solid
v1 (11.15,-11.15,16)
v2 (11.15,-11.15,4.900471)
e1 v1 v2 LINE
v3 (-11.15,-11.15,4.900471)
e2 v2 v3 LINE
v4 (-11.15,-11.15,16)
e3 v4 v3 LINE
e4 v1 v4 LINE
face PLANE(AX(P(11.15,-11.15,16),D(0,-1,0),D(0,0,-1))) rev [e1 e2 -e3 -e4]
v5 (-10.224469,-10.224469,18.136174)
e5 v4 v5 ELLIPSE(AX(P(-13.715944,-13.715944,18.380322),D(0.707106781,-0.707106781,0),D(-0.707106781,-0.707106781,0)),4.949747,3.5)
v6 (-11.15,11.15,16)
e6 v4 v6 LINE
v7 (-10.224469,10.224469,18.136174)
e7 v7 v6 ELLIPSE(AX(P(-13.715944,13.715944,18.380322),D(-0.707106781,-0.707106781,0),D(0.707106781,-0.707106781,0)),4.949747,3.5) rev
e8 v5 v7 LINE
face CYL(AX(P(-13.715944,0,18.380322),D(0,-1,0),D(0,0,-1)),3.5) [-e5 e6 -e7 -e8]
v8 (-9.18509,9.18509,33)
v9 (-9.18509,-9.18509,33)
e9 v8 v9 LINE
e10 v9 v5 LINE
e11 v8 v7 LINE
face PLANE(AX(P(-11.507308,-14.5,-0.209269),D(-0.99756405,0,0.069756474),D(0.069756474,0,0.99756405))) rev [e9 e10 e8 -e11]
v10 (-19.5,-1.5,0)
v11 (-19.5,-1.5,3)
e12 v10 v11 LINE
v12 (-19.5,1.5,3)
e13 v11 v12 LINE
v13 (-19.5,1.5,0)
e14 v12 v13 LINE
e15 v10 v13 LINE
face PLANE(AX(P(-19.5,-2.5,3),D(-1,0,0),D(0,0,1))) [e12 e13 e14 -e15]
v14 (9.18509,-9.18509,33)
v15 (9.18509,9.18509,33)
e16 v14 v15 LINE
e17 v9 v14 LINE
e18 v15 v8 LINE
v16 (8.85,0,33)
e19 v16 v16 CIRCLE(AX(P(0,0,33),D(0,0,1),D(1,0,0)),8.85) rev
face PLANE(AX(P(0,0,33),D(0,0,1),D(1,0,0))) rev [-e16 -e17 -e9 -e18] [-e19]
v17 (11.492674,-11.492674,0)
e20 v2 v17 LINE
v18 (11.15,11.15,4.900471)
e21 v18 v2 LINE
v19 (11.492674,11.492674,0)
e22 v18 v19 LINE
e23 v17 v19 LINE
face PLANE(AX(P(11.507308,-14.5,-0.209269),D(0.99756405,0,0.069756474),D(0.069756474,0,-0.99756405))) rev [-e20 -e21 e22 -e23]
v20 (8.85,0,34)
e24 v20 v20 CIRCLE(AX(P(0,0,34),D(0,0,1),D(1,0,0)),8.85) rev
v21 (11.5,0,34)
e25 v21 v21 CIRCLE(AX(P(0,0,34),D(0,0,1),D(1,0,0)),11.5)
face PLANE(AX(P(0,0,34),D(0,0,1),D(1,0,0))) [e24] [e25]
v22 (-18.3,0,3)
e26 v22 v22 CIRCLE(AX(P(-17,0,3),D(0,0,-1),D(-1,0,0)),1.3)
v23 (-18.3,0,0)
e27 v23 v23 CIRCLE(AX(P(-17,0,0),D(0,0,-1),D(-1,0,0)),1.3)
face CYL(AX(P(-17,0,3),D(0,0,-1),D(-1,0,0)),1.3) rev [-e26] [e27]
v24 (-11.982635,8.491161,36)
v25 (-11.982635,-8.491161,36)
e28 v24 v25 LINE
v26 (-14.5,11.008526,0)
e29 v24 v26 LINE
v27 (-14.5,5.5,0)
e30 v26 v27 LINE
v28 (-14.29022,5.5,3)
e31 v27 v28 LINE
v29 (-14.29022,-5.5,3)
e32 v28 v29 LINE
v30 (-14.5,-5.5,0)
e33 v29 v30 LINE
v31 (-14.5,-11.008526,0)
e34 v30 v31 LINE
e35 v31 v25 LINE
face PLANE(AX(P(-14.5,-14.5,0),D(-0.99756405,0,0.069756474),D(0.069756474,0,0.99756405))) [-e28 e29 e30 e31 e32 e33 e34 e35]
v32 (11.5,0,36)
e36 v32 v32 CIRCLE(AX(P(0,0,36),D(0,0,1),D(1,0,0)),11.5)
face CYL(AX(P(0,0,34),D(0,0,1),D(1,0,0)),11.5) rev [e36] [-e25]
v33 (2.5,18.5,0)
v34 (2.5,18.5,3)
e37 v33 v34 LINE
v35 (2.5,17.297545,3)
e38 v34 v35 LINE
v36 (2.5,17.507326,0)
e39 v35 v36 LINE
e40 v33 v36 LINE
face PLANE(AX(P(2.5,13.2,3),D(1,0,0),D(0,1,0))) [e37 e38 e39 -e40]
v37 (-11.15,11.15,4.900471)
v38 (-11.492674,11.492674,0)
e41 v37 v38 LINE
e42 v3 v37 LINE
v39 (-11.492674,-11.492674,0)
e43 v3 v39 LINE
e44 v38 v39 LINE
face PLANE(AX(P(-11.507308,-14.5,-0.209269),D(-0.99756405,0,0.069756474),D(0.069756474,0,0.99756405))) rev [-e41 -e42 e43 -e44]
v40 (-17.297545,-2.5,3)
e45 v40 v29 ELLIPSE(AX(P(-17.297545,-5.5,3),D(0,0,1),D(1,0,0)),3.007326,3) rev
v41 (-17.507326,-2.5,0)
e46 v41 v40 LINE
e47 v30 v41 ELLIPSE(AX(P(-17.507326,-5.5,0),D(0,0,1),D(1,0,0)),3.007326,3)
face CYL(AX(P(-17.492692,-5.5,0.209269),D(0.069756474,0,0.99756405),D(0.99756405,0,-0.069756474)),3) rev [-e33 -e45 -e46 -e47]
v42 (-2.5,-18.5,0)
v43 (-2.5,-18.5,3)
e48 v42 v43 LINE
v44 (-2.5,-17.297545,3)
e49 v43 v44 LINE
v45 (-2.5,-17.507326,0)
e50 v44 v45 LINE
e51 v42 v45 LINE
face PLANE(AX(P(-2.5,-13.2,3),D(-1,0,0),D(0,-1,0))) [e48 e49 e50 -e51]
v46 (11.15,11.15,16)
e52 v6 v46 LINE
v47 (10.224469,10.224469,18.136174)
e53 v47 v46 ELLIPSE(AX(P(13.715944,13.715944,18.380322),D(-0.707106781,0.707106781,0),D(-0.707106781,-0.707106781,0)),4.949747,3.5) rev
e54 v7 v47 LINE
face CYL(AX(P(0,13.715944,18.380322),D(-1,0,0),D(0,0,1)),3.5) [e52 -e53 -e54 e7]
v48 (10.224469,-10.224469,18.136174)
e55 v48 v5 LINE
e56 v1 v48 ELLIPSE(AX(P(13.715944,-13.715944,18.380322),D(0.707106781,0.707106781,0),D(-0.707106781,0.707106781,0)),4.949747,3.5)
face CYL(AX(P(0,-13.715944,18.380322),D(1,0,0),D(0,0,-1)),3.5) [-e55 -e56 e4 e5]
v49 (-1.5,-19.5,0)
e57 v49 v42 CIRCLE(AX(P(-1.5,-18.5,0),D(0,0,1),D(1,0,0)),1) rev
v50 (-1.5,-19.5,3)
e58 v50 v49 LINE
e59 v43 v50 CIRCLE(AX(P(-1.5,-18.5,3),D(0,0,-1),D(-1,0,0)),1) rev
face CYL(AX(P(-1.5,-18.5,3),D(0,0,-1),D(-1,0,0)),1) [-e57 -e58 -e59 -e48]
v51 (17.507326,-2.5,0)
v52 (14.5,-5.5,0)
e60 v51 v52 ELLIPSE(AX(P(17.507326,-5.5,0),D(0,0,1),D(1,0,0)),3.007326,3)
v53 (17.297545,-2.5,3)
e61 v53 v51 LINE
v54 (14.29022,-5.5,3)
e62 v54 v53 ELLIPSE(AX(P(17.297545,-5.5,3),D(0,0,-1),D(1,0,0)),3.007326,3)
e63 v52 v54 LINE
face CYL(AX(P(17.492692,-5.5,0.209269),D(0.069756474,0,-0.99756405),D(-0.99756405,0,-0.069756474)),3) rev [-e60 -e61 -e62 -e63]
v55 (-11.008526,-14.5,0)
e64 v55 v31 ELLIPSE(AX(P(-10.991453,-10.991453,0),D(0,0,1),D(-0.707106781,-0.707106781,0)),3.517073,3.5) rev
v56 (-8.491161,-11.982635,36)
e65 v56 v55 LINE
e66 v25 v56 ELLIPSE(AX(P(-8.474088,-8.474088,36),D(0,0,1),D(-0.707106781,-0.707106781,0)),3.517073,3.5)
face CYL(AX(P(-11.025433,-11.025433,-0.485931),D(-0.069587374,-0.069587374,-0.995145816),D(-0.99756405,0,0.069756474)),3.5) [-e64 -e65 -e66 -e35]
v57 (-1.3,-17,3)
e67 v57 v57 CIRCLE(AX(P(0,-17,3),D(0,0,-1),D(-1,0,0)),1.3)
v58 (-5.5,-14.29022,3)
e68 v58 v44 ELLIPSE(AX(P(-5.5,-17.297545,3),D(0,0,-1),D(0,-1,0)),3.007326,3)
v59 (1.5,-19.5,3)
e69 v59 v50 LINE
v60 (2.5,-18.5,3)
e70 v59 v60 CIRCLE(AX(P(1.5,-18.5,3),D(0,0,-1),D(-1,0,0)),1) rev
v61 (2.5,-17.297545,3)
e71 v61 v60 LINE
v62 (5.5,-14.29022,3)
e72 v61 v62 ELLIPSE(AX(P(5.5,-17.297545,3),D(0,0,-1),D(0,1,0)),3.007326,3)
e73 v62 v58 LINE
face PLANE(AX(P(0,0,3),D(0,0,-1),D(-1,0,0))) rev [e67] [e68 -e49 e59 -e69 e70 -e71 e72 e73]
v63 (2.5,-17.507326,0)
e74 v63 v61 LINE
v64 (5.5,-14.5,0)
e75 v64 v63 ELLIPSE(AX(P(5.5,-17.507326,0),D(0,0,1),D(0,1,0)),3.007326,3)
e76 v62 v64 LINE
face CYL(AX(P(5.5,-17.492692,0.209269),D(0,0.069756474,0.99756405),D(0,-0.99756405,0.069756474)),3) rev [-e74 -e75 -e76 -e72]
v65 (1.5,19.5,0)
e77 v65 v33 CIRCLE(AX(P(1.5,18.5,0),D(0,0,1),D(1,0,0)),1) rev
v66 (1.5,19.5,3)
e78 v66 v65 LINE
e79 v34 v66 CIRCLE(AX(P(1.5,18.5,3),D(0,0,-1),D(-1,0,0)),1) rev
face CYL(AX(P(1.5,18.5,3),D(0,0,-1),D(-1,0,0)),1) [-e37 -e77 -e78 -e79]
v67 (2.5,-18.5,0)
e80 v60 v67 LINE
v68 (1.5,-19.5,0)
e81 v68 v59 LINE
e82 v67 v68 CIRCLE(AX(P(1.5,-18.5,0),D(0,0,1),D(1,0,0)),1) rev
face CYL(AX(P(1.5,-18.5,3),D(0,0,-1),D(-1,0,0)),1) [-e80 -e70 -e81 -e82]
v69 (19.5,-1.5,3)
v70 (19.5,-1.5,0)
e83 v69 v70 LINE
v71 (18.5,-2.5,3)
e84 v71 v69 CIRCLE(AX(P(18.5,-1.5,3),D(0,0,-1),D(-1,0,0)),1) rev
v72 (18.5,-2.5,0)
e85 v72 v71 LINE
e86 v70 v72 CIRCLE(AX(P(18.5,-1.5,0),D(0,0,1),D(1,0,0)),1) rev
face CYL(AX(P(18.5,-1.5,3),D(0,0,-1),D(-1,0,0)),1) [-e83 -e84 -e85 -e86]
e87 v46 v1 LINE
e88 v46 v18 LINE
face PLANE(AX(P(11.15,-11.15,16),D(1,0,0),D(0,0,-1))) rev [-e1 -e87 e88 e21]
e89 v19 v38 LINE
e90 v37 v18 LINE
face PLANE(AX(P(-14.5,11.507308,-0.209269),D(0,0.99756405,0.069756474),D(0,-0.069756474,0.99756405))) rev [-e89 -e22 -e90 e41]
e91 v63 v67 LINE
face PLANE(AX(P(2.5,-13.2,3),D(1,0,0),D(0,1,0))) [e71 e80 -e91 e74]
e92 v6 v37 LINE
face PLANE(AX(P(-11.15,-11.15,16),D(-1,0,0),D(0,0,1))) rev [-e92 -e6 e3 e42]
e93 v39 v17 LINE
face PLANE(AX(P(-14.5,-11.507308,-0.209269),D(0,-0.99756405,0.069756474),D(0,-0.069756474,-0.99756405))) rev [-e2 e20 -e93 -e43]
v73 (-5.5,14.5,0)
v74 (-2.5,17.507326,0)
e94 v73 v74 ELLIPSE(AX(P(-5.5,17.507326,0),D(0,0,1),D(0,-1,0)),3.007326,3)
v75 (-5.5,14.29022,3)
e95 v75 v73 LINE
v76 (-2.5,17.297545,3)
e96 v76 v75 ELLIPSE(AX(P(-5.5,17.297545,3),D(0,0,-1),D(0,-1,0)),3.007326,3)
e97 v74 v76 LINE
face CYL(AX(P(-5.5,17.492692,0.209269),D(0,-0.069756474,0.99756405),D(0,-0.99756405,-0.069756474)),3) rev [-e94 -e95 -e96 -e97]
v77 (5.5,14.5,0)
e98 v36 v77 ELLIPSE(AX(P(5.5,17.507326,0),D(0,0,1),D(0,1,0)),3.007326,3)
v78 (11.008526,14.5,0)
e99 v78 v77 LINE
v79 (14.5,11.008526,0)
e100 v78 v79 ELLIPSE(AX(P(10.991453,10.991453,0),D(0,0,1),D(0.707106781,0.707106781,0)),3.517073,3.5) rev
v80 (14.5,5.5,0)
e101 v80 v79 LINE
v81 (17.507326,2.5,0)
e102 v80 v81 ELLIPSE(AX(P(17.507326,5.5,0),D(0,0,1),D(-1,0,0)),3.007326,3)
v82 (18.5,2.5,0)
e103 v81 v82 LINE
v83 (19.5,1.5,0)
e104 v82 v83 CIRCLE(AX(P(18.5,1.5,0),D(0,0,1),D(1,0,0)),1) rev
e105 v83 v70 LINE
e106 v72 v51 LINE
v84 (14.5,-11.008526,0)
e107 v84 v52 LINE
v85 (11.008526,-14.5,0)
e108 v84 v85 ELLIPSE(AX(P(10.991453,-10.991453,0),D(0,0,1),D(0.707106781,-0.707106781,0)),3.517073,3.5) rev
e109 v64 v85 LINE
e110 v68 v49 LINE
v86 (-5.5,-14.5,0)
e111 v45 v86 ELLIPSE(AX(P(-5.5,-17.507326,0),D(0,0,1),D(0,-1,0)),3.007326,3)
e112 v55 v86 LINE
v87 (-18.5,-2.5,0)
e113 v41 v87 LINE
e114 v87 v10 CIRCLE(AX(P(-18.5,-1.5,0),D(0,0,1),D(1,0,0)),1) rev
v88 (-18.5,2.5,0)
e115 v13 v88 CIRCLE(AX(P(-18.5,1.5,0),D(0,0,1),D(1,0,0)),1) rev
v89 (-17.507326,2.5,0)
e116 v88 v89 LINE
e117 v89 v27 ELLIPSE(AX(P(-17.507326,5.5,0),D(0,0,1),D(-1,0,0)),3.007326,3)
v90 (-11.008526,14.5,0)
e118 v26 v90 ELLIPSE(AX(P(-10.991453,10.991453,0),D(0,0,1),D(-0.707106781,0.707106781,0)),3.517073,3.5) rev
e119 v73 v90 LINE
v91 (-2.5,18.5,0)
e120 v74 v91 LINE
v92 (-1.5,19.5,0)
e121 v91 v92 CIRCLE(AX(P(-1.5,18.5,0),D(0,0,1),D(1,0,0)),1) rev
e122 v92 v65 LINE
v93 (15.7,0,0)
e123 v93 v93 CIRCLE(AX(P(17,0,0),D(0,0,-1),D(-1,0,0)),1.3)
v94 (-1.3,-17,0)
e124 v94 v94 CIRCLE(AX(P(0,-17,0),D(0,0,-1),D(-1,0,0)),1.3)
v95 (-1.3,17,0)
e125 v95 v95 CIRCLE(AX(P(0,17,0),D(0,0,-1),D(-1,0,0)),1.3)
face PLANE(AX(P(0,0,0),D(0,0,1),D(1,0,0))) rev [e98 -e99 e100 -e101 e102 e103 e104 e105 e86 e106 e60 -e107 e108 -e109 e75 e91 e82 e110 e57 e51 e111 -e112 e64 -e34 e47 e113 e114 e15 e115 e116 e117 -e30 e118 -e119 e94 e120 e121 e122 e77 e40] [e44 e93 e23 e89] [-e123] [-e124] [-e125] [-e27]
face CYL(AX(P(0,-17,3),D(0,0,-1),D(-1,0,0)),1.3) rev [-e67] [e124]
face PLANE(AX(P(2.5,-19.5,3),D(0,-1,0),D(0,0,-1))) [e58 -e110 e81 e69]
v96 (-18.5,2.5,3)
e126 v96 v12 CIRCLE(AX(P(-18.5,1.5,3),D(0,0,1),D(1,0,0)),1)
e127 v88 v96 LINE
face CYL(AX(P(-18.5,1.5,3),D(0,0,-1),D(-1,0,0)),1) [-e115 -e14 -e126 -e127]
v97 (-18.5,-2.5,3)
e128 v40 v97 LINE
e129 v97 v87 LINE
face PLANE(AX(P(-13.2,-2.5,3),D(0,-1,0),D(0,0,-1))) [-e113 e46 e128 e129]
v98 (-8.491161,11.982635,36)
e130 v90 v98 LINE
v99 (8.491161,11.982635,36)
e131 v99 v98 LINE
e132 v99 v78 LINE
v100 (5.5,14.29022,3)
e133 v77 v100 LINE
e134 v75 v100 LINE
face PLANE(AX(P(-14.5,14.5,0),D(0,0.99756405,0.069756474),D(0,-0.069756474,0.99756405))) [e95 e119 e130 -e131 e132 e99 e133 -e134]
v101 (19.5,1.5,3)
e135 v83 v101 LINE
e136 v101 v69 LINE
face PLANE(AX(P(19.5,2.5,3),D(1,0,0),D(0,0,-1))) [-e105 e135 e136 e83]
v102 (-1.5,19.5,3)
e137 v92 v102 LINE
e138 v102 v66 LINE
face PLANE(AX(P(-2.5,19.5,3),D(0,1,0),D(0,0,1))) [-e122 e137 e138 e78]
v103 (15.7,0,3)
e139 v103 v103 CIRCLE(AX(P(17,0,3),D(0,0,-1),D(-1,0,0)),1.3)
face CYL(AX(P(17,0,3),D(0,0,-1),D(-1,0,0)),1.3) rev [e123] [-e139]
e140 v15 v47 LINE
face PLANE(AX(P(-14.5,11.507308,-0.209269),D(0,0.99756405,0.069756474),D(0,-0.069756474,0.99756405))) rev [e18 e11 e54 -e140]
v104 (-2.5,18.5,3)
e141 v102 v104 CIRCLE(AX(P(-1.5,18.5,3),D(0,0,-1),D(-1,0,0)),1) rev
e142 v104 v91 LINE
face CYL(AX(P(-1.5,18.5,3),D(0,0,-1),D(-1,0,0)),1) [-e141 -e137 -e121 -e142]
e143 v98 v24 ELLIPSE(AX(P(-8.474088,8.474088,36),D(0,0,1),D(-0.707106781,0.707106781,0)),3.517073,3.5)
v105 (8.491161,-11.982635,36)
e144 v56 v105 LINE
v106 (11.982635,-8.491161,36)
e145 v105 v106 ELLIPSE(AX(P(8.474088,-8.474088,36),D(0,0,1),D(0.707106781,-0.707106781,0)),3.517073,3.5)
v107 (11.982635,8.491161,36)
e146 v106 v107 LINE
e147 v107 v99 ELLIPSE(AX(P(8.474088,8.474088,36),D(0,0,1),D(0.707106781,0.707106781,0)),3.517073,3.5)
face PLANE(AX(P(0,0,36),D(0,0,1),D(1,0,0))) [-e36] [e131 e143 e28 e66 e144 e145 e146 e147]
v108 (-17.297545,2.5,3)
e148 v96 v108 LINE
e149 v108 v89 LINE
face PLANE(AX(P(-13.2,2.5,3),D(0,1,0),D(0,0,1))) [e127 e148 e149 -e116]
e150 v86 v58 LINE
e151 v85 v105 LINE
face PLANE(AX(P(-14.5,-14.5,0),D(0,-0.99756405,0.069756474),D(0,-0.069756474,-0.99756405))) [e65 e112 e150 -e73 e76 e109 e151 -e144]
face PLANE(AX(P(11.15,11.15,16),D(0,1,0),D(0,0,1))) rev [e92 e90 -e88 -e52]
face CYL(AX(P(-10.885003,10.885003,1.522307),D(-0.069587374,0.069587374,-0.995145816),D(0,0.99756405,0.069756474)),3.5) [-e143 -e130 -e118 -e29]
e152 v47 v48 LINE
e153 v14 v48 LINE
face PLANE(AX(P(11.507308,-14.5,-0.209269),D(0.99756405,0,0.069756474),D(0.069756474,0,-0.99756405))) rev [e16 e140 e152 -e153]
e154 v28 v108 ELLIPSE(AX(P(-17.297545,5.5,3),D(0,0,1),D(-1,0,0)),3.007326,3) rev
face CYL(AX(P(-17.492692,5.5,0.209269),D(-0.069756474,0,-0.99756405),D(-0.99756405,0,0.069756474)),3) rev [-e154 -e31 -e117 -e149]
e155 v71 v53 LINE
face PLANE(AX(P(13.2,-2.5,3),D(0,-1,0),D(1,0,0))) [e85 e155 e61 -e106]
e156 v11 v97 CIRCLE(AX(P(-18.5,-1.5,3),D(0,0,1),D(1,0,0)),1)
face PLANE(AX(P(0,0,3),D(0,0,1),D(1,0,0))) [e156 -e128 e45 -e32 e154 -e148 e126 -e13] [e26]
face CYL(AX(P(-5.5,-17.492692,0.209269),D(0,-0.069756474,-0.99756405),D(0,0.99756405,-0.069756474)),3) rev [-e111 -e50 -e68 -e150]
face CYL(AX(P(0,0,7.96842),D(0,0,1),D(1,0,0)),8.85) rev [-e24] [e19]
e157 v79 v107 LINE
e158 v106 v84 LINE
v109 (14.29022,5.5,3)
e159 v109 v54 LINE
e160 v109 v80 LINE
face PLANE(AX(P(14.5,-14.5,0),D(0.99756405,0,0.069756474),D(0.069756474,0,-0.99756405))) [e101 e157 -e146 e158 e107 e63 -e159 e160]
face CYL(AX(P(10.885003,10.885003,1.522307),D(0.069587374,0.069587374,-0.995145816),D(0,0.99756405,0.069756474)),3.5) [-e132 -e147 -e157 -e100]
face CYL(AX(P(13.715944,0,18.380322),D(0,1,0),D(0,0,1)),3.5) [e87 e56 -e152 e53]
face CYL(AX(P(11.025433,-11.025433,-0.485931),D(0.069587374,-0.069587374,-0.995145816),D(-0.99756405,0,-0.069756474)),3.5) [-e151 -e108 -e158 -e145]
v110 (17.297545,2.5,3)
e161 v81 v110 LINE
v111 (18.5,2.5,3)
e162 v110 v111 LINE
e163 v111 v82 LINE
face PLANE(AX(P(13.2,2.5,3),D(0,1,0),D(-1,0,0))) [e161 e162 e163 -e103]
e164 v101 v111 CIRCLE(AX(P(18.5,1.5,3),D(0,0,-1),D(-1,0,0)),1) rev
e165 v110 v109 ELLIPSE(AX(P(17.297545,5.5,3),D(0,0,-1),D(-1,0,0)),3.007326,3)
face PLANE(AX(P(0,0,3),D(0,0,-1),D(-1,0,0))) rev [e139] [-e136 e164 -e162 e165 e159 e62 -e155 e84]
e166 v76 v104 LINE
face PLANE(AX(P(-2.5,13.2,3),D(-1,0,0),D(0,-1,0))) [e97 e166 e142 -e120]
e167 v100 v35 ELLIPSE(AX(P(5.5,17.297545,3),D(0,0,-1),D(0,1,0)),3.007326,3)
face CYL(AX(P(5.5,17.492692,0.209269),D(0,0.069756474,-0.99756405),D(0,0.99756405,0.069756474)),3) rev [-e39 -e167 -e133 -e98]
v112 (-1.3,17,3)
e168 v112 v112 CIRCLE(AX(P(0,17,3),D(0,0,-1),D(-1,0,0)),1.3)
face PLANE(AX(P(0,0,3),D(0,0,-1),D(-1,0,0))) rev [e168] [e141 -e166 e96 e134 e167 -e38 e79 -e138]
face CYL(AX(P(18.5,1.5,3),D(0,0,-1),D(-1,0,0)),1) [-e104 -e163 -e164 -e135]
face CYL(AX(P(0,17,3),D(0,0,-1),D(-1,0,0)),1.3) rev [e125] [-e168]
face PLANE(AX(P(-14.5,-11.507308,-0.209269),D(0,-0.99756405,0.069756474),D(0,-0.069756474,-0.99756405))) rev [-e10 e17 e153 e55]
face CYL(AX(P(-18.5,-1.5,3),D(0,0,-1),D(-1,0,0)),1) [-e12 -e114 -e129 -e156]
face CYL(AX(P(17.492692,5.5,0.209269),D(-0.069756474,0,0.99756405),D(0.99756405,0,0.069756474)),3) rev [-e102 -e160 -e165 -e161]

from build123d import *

# Parameters (mm, degrees)
SKETCH_1_W          = 29
SKETCH_1_H          = 29
EXTRUDE_1_DEPTH     = 36
EXTRUDE_1_TAPER     = 4
SHELL_1_T           = -3
SKETCH_3_W          = 22.3
SKETCH_3_H          = 22.3
CUT_EXTRUDE_2_DEPTH = 16
FILLET_1_R          = 3.5
FILLET_2_R          = 3.5
SKETCH_4_R          = 8.85
CUT_EXTRUDE_3_DEPTH = 3
SKETCH_5_R          = 11.5
CUT_EXTRUDE_4_DEPTH = 2
SKETCH_6_W          = 6.3
SKETCH_6_H          = 5
SKETCH_6_R          = 1.3
SKETCH_6_W_2        = 5
SKETCH_6_H_2        = 6.3
EXTRUDE_2_DEPTH     = 3
FILLET_3_R          = 3
FILLET_4_R          = 1


with BuildPart() as part:
    # Эскиз1 → Бобышка-Вытянуть1 (new body)
    with BuildSketch(Plane.XY):
        Rectangle(SKETCH_1_W, SKETCH_1_H)
    extrude(amount=EXTRUDE_1_DEPTH, taper=EXTRUDE_1_TAPER)

    # Оболочка1
    shell_1_openings = [part.faces().sort_by_distance(p)[0] for p in [
        (0, 0, 0),
    ]]
    offset(amount=SHELL_1_T, openings=shell_1_openings, kind=Kind.INTERSECTION)

    # Эскиз3 → Вырез-Вытянуть2 (cut)
    with BuildSketch(Plane(origin=(0, 0, 0), x_dir=(-1, 0, 0), z_dir=(0, 0, -1))):
        Rectangle(SKETCH_3_W, SKETCH_3_H)
    extrude(amount=-CUT_EXTRUDE_2_DEPTH, mode=Mode.SUBTRACT)

    # Скругление1
    # the kernel refuses this fillet: 3.5 mm, written as the material it takes off along each edge
    with BuildSketch(Plane(origin=(-10.373845315, -15.727322236, 16), x_dir=(-1, 0, 0), z_dir=(0, 1, 0))) as fillet_1_piece_1_section:
        with BuildLine():
            CenterArc((3.342098307, 2.380322106), FILLET_1_R, 184, 38.850835044)
            Line((-0.149375869, 2.136174448), (0, 0))
            Line((0, 0), (0.776154685, 0))
        make_face()
    fillet_1_piece_1 = extrude(amount=31.454644473, mode=Mode.PRIVATE)
    fillet_1_piece_1 = split(fillet_1_piece_1, bisect_by=Plane(origin=(-10.373845315, -10.399895149, 15.627470008), z_dir=(0, 0.9975640502598243, -0.06975647374412536)), keep=Keep.TOP, mode=Mode.PRIVATE)
    fillet_1_piece_1 = split(fillet_1_piece_1, bisect_by=Plane(origin=(-10.373845315, 10.24683793, 17.816290213), z_dir=(0, -0.9975640502598243, -0.06975647374412536)), keep=Keep.TOP, mode=Mode.PRIVATE)
    add(fillet_1_piece_1, mode=Mode.SUBTRACT)
    with BuildSketch(Plane(origin=(15.727322236, -10.373845315, 16), x_dir=(0, -1, 0), z_dir=(-1, 0, 0))) as fillet_1_piece_2_section:
        with BuildLine():
            CenterArc((3.342098307, 2.380322106), FILLET_1_R, 184, 38.850835044)
            Line((-0.149375869, 2.136174448), (0, 0))
            Line((0, 0), (0.776154685, 0))
        make_face()
    fillet_1_piece_2 = extrude(amount=31.454644473, mode=Mode.PRIVATE)
    fillet_1_piece_2 = split(fillet_1_piece_2, bisect_by=Plane(origin=(-10.24683793, -10.373845315, 17.816290213), z_dir=(0.9975640502598243, 0, -0.06975647374412536)), keep=Keep.TOP, mode=Mode.PRIVATE)
    fillet_1_piece_2 = split(fillet_1_piece_2, bisect_by=Plane(origin=(10.399895149, -10.373845315, 15.627470008), z_dir=(-0.9975640502598243, 0, -0.06975647374412536)), keep=Keep.TOP, mode=Mode.PRIVATE)
    add(fillet_1_piece_2, mode=Mode.SUBTRACT)
    with BuildSketch(Plane(origin=(10.373845315, 15.727322236, 16), x_dir=(1, 0, 0), z_dir=(0, -1, 0))) as fillet_1_piece_3_section:
        with BuildLine():
            CenterArc((3.342098307, 2.380322106), FILLET_1_R, 184, 38.850835044)
            Line((-0.149375869, 2.136174448), (0, 0))
            Line((0, 0), (0.776154685, 0))
        make_face()
    fillet_1_piece_3 = extrude(amount=31.454644473, mode=Mode.PRIVATE)
    fillet_1_piece_3 = split(fillet_1_piece_3, bisect_by=Plane(origin=(10.373845315, -10.24683793, 17.816290213), z_dir=(0, 0.9975640502598243, -0.06975647374412536)), keep=Keep.TOP, mode=Mode.PRIVATE)
    fillet_1_piece_3 = split(fillet_1_piece_3, bisect_by=Plane(origin=(10.373845315, 10.399895149, 15.627470008), z_dir=(0, -0.9975640502598243, -0.06975647374412536)), keep=Keep.TOP, mode=Mode.PRIVATE)
    add(fillet_1_piece_3, mode=Mode.SUBTRACT)
    with BuildSketch(Plane(origin=(-15.727322236, 10.373845315, 16), x_dir=(0, 1, 0), z_dir=(1, 0, 0))) as fillet_1_piece_4_section:
        with BuildLine():
            CenterArc((3.342098307, 2.380322106), FILLET_1_R, 184, 38.850835044)
            Line((-0.149375869, 2.136174448), (0, 0))
            Line((0, 0), (0.776154685, 0))
        make_face()
    fillet_1_piece_4 = extrude(amount=31.454644473, mode=Mode.PRIVATE)
    fillet_1_piece_4 = split(fillet_1_piece_4, bisect_by=Plane(origin=(-10.399895149, 10.373845315, 15.627470008), z_dir=(0.9975640502598243, 0, -0.06975647374412536)), keep=Keep.TOP, mode=Mode.PRIVATE)
    fillet_1_piece_4 = split(fillet_1_piece_4, bisect_by=Plane(origin=(10.24683793, 10.373845315, 17.816290213), z_dir=(-0.9975640502598243, 0, -0.06975647374412536)), keep=Keep.TOP, mode=Mode.PRIVATE)
    add(fillet_1_piece_4, mode=Mode.SUBTRACT)
    with BuildSketch(Plane(origin=(15.727322236, -10.373845315, 16), x_dir=(0, -1, 0), z_dir=(-1, 0, 0))) as fillet_1_piece_5a_section:
        with BuildLine():
            CenterArc((3.342098307, 2.380322106), FILLET_1_R, 184, 38.850835044)
            Line((-0.149375869, 2.136174448), (0, 0))
            Line((0, 0), (0.776154685, 0))
        make_face()
    fillet_1_piece_5a = extrude(amount=31.454644473, mode=Mode.PRIVATE)
    fillet_1_piece_5a = split(fillet_1_piece_5a, bisect_by=Plane(origin=(-11.15, -10.373845315, 16), z_dir=(1, 0, 0)), keep=Keep.TOP, mode=Mode.PRIVATE)
    fillet_1_piece_5a = split(fillet_1_piece_5a, bisect_by=Plane(origin=(-10.24683793, -10.373845315, 17.816290213), z_dir=(-0.9975640502598243, 0, 0.06975647374412536)), keep=Keep.TOP, mode=Mode.PRIVATE)
    with BuildSketch(Plane(origin=(-10.373845315, -15.727322236, 16), x_dir=(-1, 0, 0), z_dir=(0, 1, 0))) as fillet_1_piece_5b_section:
        with BuildLine():
            CenterArc((3.342098307, 2.380322106), FILLET_1_R, 184, 38.850835044)
            Line((-0.149375869, 2.136174448), (0, 0))
            Line((0, 0), (0.776154685, 0))
        make_face()
    fillet_1_piece_5b = extrude(amount=31.454644473, mode=Mode.PRIVATE)
    fillet_1_piece_5b = split(fillet_1_piece_5b, bisect_by=Plane(origin=(-10.373845315, -11.15, 16), z_dir=(0, 1, 0)), keep=Keep.TOP, mode=Mode.PRIVATE)
    fillet_1_piece_5b = split(fillet_1_piece_5b, bisect_by=Plane(origin=(-10.373845315, -10.399895149, 15.627470008), z_dir=(0, -0.9975640502598243, 0.06975647374412536)), keep=Keep.TOP, mode=Mode.PRIVATE)
    fillet_1_piece_5 = fillet_1_piece_5a & fillet_1_piece_5b
    add(fillet_1_piece_5, mode=Mode.SUBTRACT)
    with BuildSketch(Plane(origin=(-10.373845315, -15.727322236, 16), x_dir=(-1, 0, 0), z_dir=(0, 1, 0))) as fillet_1_piece_6a_section:
        with BuildLine():
            CenterArc((3.342098307, 2.380322106), FILLET_1_R, 184, 38.850835044)
            Line((-0.149375869, 2.136174448), (0, 0))
            Line((0, 0), (0.776154685, 0))
        make_face()
    fillet_1_piece_6a = extrude(amount=31.454644473, mode=Mode.PRIVATE)
    fillet_1_piece_6a = split(fillet_1_piece_6a, bisect_by=Plane(origin=(-10.373845315, 11.15, 16), z_dir=(0, -1, 0)), keep=Keep.TOP, mode=Mode.PRIVATE)
    fillet_1_piece_6a = split(fillet_1_piece_6a, bisect_by=Plane(origin=(-10.373845315, 10.24683793, 17.816290213), z_dir=(0, 0.9975640502598243, 0.06975647374412536)), keep=Keep.TOP, mode=Mode.PRIVATE)
    with BuildSketch(Plane(origin=(-15.727322236, 10.373845315, 16), x_dir=(0, 1, 0), z_dir=(1, 0, 0))) as fillet_1_piece_6b_section:
        with BuildLine():
            CenterArc((3.342098307, 2.380322106), FILLET_1_R, 184, 38.850835044)
            Line((-0.149375869, 2.136174448), (0, 0))
            Line((0, 0), (0.776154685, 0))
        make_face()
    fillet_1_piece_6b = extrude(amount=31.454644473, mode=Mode.PRIVATE)
    fillet_1_piece_6b = split(fillet_1_piece_6b, bisect_by=Plane(origin=(-11.15, 10.373845315, 16), z_dir=(1, 0, 0)), keep=Keep.TOP, mode=Mode.PRIVATE)
    fillet_1_piece_6b = split(fillet_1_piece_6b, bisect_by=Plane(origin=(-10.399895149, 10.373845315, 15.627470008), z_dir=(-0.9975640502598243, 0, 0.06975647374412536)), keep=Keep.TOP, mode=Mode.PRIVATE)
    fillet_1_piece_6 = fillet_1_piece_6a & fillet_1_piece_6b
    add(fillet_1_piece_6, mode=Mode.SUBTRACT)
    with BuildSketch(Plane(origin=(15.727322236, -10.373845315, 16), x_dir=(0, -1, 0), z_dir=(-1, 0, 0))) as fillet_1_piece_7a_section:
        with BuildLine():
            CenterArc((3.342098307, 2.380322106), FILLET_1_R, 184, 38.850835044)
            Line((-0.149375869, 2.136174448), (0, 0))
            Line((0, 0), (0.776154685, 0))
        make_face()
    fillet_1_piece_7a = extrude(amount=31.454644473, mode=Mode.PRIVATE)
    fillet_1_piece_7a = split(fillet_1_piece_7a, bisect_by=Plane(origin=(11.15, -10.373845315, 16), z_dir=(-1, 0, 0)), keep=Keep.TOP, mode=Mode.PRIVATE)
    fillet_1_piece_7a = split(fillet_1_piece_7a, bisect_by=Plane(origin=(10.399895149, -10.373845315, 15.627470008), z_dir=(0.9975640502598243, 0, 0.06975647374412536)), keep=Keep.TOP, mode=Mode.PRIVATE)
    with BuildSketch(Plane(origin=(10.373845315, 15.727322236, 16), x_dir=(1, 0, 0), z_dir=(0, -1, 0))) as fillet_1_piece_7b_section:
        with BuildLine():
            CenterArc((3.342098307, 2.380322106), FILLET_1_R, 184, 38.850835044)
            Line((-0.149375869, 2.136174448), (0, 0))
            Line((0, 0), (0.776154685, 0))
        make_face()
    fillet_1_piece_7b = extrude(amount=31.454644473, mode=Mode.PRIVATE)
    fillet_1_piece_7b = split(fillet_1_piece_7b, bisect_by=Plane(origin=(10.373845315, -11.15, 16), z_dir=(0, 1, 0)), keep=Keep.TOP, mode=Mode.PRIVATE)
    fillet_1_piece_7b = split(fillet_1_piece_7b, bisect_by=Plane(origin=(10.373845315, -10.24683793, 17.816290213), z_dir=(0, -0.9975640502598243, 0.06975647374412536)), keep=Keep.TOP, mode=Mode.PRIVATE)
    fillet_1_piece_7 = fillet_1_piece_7a & fillet_1_piece_7b
    add(fillet_1_piece_7, mode=Mode.SUBTRACT)
    with BuildSketch(Plane(origin=(-15.727322236, 10.373845315, 16), x_dir=(0, 1, 0), z_dir=(1, 0, 0))) as fillet_1_piece_8a_section:
        with BuildLine():
            CenterArc((3.342098307, 2.380322106), FILLET_1_R, 184, 38.850835044)
            Line((-0.149375869, 2.136174448), (0, 0))
            Line((0, 0), (0.776154685, 0))
        make_face()
    fillet_1_piece_8a = extrude(amount=31.454644473, mode=Mode.PRIVATE)
    fillet_1_piece_8a = split(fillet_1_piece_8a, bisect_by=Plane(origin=(11.15, 10.373845315, 16), z_dir=(-1, 0, 0)), keep=Keep.TOP, mode=Mode.PRIVATE)
    fillet_1_piece_8a = split(fillet_1_piece_8a, bisect_by=Plane(origin=(10.24683793, 10.373845315, 17.816290213), z_dir=(0.9975640502598243, 0, 0.06975647374412536)), keep=Keep.TOP, mode=Mode.PRIVATE)
    with BuildSketch(Plane(origin=(10.373845315, 15.727322236, 16), x_dir=(1, 0, 0), z_dir=(0, -1, 0))) as fillet_1_piece_8b_section:
        with BuildLine():
            CenterArc((3.342098307, 2.380322106), FILLET_1_R, 184, 38.850835044)
            Line((-0.149375869, 2.136174448), (0, 0))
            Line((0, 0), (0.776154685, 0))
        make_face()
    fillet_1_piece_8b = extrude(amount=31.454644473, mode=Mode.PRIVATE)
    fillet_1_piece_8b = split(fillet_1_piece_8b, bisect_by=Plane(origin=(10.373845315, 11.15, 16), z_dir=(0, -1, 0)), keep=Keep.TOP, mode=Mode.PRIVATE)
    fillet_1_piece_8b = split(fillet_1_piece_8b, bisect_by=Plane(origin=(10.373845315, 10.399895149, 15.627470008), z_dir=(0, 0.9975640502598243, 0.06975647374412536)), keep=Keep.TOP, mode=Mode.PRIVATE)
    fillet_1_piece_8 = fillet_1_piece_8a & fillet_1_piece_8b
    add(fillet_1_piece_8, mode=Mode.SUBTRACT)

    # Скругление2
    fillet_2_edges = [part.edges().sort_by_distance(p)[0] for p in [
        (-13.241317385, -13.241317385, 18),
        (-13.241317385, 13.241317385, 18),
        (13.241316923, 13.241316923, 18.000006606),
        (13.241317385, -13.241317385, 18),
    ]]
    fillet(fillet_2_edges, radius=FILLET_2_R)

    # Эскиз4 → Вырез-Вытянуть3 (cut)
    with BuildSketch(Plane.XY.offset(36)):
        Circle(SKETCH_4_R)
    extrude(amount=-CUT_EXTRUDE_3_DEPTH, mode=Mode.SUBTRACT)

    # Эскиз5 → Вырез-Вытянуть4 (cut)
    with BuildSketch(Plane.XY.offset(36)):
        Circle(SKETCH_5_R)
    extrude(amount=-CUT_EXTRUDE_4_DEPTH, mode=Mode.SUBTRACT)

    # Эскиз6 → Бобышка-Вытянуть2 (add)
    # profile 1 of 4: a face of its own
    with BuildSketch(Plane(origin=(0, 0, 0), x_dir=(-1, 0, 0), z_dir=(0, 0, -1))):
        with Locations((16.35, 0)):
            Rectangle(SKETCH_6_W, SKETCH_6_H)
        with Locations((17, 0)):
            Circle(SKETCH_6_R, mode=Mode.SUBTRACT)
    # profile 2 of 4: a face of its own
    with BuildSketch(Plane(origin=(0, 0, 0), x_dir=(-1, 0, 0), z_dir=(0, 0, -1))):
        with Locations((0, -16.35)):
            Rectangle(SKETCH_6_W_2, SKETCH_6_H_2)
        with Locations((0, -17)):
            Circle(SKETCH_6_R, mode=Mode.SUBTRACT)
    # profile 3 of 4: a face of its own
    with BuildSketch(Plane(origin=(0, 0, 0), x_dir=(-1, 0, 0), z_dir=(0, 0, -1))):
        with Locations((-16.35, 0)):
            Rectangle(SKETCH_6_W, SKETCH_6_H)
        with Locations((-17, 0)):
            Circle(SKETCH_6_R, mode=Mode.SUBTRACT)
    # profile 4 of 4: a face of its own
    with BuildSketch(Plane(origin=(0, 0, 0), x_dir=(-1, 0, 0), z_dir=(0, 0, -1))):
        with Locations((0, 16.35)):
            Rectangle(SKETCH_6_W_2, SKETCH_6_H_2)
        with Locations((0, 17)):
            Circle(SKETCH_6_R, mode=Mode.SUBTRACT)
    extrude(amount=-EXTRUDE_2_DEPTH)

    # Скругление3
    fillet_3_edges = [part.edges().sort_by_distance(p)[0] for p in [
        (-14.395109782, -2.5, 1.5),
        (-14.395109782, 2.5, 1.5),
        (-2.5, -14.395109782, 1.5),
        (2.5, -14.395109782, 1.5),
        (14.395109782, -2.5, 1.5),
        (14.395109782, 2.5, 1.5),
        (2.5, 14.395109782, 1.5),
        (-2.5, 14.395109782, 1.5),
    ]]
    fillet(fillet_3_edges, radius=FILLET_3_R)

    # Скругление4
    fillet_4_edges = [part.edges().sort_by_distance(p)[0] for p in [
        (-19.5, -2.5, 1.5),
        (-19.5, 2.5, 1.5),
        (2.5, -19.5, 1.5),
        (-2.5, -19.5, 1.5),
        (19.5, 2.5, 1.5),
        (19.5, -2.5, 1.5),
        (-2.5, 19.5, 1.5),
        (2.5, 19.5, 1.5),
    ]]
    fillet(fillet_4_edges, radius=FILLET_4_R)


solid = part.part
